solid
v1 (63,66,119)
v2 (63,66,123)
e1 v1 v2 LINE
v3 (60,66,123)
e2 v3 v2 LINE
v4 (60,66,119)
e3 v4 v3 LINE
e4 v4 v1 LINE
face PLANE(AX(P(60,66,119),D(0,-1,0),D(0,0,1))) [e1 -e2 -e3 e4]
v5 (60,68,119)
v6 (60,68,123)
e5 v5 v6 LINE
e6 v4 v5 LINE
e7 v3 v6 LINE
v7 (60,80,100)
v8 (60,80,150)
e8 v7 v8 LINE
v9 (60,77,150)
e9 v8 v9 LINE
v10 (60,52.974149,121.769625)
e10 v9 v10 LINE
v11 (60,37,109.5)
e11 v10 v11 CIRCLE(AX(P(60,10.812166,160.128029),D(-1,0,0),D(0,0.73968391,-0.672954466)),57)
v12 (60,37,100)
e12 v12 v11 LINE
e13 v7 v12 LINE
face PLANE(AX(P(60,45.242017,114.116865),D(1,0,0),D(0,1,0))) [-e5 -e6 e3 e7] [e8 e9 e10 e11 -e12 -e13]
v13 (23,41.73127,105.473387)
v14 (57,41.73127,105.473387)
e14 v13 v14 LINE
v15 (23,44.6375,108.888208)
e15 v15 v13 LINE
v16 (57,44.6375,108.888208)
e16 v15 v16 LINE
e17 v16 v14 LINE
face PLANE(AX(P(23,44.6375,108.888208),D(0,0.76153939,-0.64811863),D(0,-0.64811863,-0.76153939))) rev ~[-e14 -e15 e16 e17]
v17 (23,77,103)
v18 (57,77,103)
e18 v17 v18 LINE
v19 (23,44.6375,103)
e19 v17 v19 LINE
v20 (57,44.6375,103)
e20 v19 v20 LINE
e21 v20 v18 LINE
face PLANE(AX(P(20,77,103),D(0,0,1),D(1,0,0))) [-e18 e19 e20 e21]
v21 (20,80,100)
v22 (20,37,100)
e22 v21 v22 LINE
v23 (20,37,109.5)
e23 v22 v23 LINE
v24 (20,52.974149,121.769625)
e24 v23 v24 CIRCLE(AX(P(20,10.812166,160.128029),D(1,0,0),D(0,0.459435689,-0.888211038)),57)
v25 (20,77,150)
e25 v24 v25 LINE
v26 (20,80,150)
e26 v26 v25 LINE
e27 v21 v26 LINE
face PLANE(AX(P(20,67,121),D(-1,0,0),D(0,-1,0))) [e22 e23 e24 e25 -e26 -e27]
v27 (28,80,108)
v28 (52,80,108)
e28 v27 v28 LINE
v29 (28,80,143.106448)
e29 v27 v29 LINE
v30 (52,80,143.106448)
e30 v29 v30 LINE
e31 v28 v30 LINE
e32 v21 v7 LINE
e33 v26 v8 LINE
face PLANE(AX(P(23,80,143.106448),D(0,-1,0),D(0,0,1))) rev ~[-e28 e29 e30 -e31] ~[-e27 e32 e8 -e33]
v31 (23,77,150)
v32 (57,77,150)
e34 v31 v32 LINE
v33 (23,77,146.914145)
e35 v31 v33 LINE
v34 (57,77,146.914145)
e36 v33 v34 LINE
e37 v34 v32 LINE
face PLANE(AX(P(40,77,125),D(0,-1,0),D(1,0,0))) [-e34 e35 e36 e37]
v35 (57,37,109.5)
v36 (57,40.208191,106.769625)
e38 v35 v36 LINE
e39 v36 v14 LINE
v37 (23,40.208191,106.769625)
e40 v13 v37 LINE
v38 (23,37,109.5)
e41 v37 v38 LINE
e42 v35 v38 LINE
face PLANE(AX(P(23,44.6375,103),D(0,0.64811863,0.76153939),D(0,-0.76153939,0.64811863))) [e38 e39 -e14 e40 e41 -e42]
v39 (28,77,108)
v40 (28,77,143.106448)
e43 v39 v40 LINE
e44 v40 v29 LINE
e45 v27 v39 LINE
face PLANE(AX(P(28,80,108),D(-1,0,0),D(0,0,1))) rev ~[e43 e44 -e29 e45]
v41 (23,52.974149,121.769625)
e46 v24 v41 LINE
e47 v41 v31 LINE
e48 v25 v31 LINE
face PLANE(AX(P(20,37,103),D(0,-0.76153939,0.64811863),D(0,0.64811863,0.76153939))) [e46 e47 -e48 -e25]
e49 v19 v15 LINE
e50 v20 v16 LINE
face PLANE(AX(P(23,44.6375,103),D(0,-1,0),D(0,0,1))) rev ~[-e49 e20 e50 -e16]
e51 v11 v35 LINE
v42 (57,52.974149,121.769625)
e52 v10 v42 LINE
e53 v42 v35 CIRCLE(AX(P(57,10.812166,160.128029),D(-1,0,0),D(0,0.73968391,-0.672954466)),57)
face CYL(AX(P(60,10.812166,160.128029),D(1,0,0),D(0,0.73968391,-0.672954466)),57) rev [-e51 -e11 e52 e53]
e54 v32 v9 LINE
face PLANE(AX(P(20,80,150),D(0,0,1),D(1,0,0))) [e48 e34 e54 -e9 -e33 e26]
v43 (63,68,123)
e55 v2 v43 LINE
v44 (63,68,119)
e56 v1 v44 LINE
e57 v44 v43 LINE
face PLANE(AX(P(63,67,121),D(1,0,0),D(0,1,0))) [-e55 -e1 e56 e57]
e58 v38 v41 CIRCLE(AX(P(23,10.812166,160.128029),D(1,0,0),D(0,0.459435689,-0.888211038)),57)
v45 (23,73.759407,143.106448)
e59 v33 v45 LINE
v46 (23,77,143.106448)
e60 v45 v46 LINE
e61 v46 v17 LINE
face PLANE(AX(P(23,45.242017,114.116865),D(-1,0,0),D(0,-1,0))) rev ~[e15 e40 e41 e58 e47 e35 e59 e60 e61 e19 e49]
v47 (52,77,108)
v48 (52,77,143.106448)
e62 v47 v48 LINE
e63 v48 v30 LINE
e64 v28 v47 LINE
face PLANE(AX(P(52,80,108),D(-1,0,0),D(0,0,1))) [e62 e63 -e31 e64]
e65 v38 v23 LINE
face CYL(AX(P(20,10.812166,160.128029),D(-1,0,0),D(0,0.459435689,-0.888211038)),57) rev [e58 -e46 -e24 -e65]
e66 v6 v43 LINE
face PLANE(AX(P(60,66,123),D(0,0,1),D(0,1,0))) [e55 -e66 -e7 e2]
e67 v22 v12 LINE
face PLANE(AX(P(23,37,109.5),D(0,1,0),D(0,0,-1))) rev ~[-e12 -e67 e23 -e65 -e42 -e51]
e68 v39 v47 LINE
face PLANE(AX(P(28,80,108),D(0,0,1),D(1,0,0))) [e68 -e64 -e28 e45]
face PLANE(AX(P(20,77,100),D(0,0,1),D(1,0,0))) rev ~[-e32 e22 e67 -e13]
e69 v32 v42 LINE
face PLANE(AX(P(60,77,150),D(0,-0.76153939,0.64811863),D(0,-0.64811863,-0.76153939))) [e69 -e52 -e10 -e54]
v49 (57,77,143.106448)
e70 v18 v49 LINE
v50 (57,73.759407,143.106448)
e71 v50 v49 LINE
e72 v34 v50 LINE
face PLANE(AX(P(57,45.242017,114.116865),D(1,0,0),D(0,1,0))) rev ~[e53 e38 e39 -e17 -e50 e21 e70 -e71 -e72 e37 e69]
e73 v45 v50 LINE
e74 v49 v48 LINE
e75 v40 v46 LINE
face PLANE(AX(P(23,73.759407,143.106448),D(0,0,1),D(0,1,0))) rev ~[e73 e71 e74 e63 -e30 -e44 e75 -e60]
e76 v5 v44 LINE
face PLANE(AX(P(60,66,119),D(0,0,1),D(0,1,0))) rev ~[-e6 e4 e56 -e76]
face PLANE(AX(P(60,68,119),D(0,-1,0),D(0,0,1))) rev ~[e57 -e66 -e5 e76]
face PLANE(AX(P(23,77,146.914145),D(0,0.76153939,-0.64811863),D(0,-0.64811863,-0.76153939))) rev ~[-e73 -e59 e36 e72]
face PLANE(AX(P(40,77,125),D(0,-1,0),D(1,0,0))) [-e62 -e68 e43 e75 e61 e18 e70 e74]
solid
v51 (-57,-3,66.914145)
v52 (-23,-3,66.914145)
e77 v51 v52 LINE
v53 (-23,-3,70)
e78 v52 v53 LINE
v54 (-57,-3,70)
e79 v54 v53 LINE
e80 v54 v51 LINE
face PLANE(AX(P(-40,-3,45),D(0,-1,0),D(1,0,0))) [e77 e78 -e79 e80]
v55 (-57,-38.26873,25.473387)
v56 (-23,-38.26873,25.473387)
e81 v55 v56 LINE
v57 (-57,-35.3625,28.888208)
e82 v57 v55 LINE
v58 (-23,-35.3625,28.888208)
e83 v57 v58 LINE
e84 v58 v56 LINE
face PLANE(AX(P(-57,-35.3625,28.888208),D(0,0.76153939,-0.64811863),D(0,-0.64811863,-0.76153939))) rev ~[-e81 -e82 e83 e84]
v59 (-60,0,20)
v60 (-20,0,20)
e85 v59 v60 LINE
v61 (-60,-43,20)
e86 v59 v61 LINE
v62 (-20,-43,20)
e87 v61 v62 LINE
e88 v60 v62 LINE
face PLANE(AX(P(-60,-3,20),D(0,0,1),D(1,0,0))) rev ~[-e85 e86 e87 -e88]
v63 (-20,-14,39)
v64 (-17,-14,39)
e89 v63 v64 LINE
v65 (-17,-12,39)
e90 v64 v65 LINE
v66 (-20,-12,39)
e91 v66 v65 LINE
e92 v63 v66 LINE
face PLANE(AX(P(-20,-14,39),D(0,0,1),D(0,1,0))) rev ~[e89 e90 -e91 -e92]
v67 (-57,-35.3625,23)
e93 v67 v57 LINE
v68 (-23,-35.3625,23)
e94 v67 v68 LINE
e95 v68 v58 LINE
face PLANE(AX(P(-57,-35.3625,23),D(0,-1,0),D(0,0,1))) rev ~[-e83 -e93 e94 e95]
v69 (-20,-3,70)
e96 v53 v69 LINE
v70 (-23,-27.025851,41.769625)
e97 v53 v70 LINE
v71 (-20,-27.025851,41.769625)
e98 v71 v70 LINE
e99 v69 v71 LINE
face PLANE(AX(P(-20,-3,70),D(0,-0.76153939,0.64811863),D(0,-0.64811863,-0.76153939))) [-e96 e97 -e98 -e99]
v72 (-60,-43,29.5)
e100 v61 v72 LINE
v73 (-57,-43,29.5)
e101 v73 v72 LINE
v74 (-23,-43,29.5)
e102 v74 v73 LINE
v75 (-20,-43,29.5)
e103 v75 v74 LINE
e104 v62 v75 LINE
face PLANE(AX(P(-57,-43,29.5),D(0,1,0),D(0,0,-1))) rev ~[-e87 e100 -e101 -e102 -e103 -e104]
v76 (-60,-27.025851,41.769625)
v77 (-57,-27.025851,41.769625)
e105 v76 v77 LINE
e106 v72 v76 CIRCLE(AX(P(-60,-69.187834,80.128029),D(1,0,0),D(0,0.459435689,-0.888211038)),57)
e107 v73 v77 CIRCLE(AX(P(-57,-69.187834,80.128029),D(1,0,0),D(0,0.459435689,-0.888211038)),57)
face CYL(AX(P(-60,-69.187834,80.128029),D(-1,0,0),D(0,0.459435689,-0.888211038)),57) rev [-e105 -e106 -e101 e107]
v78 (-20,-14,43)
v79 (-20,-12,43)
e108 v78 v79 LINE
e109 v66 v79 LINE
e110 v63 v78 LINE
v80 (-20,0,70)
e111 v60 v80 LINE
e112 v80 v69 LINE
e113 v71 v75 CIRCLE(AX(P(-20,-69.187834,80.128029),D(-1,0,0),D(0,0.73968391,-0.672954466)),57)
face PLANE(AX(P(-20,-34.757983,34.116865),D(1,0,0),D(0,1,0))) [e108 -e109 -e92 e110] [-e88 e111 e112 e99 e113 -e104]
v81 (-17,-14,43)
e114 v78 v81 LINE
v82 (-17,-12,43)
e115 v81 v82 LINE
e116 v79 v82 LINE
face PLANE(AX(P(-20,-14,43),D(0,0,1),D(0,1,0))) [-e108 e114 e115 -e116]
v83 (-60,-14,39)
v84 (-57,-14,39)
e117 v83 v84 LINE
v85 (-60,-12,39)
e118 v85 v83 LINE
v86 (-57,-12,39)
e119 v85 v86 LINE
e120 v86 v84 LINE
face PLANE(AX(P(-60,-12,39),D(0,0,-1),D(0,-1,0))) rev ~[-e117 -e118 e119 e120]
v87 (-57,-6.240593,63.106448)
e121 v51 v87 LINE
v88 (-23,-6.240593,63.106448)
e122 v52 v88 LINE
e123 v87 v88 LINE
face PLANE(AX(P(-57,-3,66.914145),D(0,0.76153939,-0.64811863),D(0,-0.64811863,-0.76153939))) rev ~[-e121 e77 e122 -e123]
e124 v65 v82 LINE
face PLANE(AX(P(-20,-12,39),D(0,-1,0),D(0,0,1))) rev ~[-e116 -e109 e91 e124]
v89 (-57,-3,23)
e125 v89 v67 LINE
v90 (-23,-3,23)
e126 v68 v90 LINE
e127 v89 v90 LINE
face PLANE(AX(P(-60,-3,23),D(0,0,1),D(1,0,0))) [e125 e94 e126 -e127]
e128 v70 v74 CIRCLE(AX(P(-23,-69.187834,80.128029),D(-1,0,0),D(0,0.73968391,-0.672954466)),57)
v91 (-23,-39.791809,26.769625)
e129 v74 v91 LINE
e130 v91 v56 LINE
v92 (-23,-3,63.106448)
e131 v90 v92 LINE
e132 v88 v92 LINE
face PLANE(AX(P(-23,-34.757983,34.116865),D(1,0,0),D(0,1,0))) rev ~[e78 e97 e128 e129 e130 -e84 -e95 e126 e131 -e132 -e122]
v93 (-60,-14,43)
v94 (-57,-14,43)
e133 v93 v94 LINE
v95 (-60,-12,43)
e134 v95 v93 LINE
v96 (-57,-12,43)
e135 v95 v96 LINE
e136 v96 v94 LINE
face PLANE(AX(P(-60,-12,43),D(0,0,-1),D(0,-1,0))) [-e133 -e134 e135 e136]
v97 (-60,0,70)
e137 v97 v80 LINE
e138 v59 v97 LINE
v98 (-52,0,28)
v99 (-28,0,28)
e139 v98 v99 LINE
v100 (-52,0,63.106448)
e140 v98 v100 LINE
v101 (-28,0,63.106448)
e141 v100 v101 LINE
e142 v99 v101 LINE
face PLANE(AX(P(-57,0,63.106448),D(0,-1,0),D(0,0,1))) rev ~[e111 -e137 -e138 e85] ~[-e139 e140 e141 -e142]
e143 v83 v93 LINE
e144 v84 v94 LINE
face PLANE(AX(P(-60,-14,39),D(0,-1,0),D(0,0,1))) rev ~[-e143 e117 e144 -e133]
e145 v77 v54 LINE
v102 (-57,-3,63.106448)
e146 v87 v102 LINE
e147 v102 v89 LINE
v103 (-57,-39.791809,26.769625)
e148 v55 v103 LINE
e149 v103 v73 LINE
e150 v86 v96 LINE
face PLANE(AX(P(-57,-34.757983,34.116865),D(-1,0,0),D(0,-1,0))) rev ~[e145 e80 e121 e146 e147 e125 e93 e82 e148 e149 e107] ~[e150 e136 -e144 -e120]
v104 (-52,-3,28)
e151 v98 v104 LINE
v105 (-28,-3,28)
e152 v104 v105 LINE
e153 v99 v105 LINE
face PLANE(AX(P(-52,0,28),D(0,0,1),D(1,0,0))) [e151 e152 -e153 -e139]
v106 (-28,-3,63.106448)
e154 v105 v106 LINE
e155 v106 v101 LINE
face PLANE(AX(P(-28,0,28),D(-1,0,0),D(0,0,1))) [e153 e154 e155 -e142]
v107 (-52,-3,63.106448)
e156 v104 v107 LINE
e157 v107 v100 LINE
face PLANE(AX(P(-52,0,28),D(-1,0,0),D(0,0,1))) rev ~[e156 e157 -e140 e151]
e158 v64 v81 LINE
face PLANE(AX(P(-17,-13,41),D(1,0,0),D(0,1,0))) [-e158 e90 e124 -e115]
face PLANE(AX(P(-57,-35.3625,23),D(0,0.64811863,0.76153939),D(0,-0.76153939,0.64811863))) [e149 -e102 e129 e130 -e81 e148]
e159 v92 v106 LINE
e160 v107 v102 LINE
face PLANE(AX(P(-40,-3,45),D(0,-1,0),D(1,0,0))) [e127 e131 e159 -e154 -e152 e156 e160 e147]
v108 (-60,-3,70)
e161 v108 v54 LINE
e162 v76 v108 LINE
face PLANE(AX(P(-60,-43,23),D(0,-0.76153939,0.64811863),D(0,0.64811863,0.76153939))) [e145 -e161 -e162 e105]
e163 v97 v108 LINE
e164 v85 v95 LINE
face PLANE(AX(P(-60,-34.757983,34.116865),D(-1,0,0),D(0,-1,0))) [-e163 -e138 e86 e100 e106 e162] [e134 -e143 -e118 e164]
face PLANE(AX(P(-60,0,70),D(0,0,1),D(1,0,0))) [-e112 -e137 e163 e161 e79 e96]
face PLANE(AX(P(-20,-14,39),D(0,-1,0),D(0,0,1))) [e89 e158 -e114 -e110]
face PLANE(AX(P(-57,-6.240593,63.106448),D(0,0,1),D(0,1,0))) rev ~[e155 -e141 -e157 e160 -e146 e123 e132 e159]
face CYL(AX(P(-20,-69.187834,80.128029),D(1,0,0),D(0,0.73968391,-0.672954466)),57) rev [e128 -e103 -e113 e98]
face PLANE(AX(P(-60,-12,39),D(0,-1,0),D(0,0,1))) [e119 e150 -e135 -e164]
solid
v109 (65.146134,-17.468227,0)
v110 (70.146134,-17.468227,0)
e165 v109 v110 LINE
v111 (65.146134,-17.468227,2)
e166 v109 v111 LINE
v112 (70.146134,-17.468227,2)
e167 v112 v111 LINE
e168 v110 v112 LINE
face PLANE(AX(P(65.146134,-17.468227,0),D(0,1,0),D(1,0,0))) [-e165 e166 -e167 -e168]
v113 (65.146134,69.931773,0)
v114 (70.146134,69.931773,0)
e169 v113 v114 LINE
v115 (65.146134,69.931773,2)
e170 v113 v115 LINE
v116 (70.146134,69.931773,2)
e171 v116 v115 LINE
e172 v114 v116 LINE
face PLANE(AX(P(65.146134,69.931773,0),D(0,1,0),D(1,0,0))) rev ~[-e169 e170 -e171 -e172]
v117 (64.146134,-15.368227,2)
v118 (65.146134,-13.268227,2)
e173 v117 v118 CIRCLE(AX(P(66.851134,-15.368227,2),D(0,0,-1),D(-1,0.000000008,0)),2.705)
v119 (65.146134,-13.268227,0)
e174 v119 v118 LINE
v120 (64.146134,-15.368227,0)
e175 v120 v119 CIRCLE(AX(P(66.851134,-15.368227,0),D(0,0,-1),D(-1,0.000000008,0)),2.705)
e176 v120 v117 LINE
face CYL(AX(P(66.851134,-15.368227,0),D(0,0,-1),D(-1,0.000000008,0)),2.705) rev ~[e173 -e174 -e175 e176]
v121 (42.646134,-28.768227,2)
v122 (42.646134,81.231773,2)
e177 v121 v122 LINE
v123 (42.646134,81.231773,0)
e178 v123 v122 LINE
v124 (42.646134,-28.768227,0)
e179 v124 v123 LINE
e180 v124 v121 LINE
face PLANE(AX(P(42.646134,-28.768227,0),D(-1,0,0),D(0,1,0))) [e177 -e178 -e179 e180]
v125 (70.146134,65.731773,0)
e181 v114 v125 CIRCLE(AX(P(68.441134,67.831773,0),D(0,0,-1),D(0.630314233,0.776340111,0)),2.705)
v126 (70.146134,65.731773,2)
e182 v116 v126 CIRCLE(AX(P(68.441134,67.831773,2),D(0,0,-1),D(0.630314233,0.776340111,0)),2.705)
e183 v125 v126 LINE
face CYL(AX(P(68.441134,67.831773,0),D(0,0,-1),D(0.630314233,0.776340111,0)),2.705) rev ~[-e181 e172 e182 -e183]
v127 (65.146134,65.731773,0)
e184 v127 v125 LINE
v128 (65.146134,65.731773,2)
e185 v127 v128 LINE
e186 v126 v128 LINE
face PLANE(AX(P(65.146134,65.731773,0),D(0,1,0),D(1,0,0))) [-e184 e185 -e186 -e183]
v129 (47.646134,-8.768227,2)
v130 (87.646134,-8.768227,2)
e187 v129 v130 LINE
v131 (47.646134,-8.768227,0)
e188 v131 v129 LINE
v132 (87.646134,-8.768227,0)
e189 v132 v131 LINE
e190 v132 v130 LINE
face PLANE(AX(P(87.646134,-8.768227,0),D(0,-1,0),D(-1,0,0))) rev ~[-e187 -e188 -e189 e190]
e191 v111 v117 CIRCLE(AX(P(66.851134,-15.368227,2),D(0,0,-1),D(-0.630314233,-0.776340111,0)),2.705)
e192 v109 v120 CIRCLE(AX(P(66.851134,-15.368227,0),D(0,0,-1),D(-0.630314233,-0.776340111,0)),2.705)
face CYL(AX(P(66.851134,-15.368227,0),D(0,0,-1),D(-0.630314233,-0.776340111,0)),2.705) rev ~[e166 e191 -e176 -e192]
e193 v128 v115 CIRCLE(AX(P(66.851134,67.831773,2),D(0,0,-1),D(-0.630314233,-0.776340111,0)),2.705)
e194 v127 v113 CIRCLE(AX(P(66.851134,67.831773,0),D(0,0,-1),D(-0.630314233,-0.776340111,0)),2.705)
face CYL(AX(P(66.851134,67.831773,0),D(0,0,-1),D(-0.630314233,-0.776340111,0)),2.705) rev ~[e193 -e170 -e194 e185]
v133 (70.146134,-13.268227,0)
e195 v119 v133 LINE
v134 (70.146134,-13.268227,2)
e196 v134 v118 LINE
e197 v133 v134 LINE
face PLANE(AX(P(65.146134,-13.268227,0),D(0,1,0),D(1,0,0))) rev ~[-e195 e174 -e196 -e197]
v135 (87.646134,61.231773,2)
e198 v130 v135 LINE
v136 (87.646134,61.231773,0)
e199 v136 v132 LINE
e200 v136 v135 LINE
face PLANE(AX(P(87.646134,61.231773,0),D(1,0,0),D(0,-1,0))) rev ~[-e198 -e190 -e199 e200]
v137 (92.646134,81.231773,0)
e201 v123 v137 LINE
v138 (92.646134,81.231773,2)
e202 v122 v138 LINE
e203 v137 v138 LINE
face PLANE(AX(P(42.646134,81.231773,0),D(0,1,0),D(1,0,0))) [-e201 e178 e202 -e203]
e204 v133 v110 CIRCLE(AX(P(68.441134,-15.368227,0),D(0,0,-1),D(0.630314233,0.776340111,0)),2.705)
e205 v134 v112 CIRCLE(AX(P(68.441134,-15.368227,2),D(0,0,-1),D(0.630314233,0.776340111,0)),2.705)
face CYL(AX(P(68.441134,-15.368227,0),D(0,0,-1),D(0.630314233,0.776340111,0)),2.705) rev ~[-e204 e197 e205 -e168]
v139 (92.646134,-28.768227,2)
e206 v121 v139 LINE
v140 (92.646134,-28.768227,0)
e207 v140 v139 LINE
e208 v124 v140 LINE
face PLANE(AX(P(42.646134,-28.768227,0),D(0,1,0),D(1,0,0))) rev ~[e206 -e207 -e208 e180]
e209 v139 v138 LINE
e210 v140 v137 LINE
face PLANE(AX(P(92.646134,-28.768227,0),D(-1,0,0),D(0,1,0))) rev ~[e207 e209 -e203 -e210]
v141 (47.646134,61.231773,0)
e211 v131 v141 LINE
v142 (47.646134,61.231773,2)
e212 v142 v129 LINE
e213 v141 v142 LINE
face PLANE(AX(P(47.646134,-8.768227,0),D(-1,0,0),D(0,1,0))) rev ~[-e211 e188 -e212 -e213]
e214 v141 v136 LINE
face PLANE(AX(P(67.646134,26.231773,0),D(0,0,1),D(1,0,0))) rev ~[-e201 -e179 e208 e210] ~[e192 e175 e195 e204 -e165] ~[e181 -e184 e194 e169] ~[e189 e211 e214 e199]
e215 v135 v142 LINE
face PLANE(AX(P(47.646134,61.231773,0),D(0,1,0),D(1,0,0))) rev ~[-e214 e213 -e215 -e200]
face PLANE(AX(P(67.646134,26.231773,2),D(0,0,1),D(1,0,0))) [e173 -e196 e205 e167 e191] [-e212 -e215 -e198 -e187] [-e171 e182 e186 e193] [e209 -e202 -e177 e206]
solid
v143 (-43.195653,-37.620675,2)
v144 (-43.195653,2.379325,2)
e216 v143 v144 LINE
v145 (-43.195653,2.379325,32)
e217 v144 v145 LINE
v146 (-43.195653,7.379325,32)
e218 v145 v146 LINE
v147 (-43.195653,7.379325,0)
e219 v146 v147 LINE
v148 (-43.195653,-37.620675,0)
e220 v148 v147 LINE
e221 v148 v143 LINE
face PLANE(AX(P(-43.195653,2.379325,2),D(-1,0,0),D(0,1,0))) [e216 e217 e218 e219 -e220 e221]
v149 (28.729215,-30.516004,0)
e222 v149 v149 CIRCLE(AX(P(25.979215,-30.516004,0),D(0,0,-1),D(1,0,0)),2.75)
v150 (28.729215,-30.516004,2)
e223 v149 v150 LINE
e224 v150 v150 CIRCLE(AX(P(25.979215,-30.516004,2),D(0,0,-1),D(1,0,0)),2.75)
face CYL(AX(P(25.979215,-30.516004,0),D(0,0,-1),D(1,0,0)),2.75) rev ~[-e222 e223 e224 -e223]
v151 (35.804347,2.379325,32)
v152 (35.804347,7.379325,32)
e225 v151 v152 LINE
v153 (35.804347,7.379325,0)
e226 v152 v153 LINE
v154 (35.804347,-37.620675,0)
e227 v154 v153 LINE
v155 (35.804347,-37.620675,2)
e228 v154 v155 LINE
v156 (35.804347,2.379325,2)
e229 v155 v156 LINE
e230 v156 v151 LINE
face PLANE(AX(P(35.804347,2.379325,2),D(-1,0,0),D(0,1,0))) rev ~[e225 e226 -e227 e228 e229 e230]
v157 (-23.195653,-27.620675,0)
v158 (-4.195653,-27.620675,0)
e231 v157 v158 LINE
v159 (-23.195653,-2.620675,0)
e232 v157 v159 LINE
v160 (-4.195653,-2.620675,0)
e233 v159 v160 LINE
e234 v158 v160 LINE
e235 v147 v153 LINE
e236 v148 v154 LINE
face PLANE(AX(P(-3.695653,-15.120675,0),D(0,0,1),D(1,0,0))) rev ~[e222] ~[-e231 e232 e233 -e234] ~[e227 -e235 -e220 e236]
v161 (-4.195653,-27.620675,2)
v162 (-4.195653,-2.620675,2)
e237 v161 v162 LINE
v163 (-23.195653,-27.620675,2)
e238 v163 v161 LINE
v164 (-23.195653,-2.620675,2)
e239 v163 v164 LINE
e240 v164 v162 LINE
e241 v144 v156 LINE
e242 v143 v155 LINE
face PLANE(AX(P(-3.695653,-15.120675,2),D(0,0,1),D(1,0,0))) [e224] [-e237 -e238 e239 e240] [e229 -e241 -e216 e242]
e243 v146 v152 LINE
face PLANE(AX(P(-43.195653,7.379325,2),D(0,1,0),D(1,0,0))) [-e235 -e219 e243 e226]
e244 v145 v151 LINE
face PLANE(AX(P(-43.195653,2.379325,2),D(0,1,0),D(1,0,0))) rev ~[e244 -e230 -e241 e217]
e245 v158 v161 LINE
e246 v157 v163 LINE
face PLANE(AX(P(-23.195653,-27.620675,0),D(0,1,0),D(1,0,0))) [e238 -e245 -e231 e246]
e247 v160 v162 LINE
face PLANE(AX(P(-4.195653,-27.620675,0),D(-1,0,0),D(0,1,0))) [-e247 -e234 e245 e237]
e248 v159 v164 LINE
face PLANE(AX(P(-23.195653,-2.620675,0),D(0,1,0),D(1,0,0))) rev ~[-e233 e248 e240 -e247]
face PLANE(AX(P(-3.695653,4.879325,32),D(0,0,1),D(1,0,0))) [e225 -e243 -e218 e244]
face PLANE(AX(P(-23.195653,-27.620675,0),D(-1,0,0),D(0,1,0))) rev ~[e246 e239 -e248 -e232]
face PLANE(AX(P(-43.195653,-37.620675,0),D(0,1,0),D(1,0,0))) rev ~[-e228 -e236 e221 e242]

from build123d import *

# Parameters (mm, degrees)
F0_W           = 40
F0_H           = 50
F0_W_2         = 24
F0_H_2         = 38
F1_DEPTH       = 3
F2_W           = 40
F2_H           = 3
F3_DEPTH       = 40
F5_DEPTH       = 3
F7_DEPTH       = 3
F8_W           = 3
F8_H           = 2.8935517733
F9_DEPTH       = 34
F11_DEPTH      = 37
F11_DEPTH_BACK = 3
F13_DEPTH      = 34
F14_W          = 2
F14_H          = 4
F15_DEPTH      = 3
F16_W          = 2
F16_H          = 4
F17_DEPTH      = 25
F19_DEPTH      = 3
F21_DEPTH      = 3
F23_W          = 2
F23_H          = 4
F24_DEPTH      = 3
F25_W          = 50
F25_H          = 110
F26_DEPTH      = 2
F28_DEPTH      = 25
F29_W          = 5
F29_H          = 4.2
F30_DEPTH      = 25
F32_W          = 79
F32_H          = 45
F32_W_2        = 19
F32_H_2        = 25
F33_DEPTH      = 2
F34_W          = 79
F34_H          = 5
F35_DEPTH      = 30
F36_R          = 2.75
F37_DEPTH      = 25


with BuildPart() as f1:
    # F0 (on Front) → F1 (new body)
    with BuildSketch(Plane.XZ):
        with Locations((-40, 45)):
            Rectangle(F0_W, F0_H)
        with Locations((-40, 47)):
            Rectangle(F0_W_2, F0_H_2, mode=Mode.SUBTRACT)
    extrude(amount=F1_DEPTH)

    # F2 (on face) → F3 (join)
    with BuildSketch(Plane.XZ.offset(3)):
        with Locations((-40, 21.5)):
            Rectangle(F2_W, F2_H)
    extrude(amount=F3_DEPTH)

    # F4 (on face) → F5 (join)
    with BuildSketch(Plane(origin=(-60, 0, 0), x_dir=(0, -1, 0), z_dir=(-1, 0, 0))):
        Polygon((43, 23), (3, 70), (3, 23), align=None)
    extrude(amount=-F5_DEPTH)

    # F6 (on face) → F7 (join)
    with BuildSketch(Plane.YZ.offset(-20)):
        Polygon((-3, 70), (-43, 23), (-3, 23), align=None)
    extrude(amount=-F7_DEPTH)

    # F8 (on face) → F9 (join, through all)
    with BuildSketch(Plane.YZ.offset(-57)):
        Polygon((-3, 66), (-3, 66.9141451752), (-6.2405931476, 63.1064482267), (-3, 63.1064482267), align=None)
        with Locations((-1.5, 64.5532241133)):
            Rectangle(F8_W, F8_H)
    extrude(amount=F9_DEPTH)

    # F10 (on face) → F11 (join, two sides)
    with BuildSketch(Plane.YZ.offset(-57)) as f11_sk:
        Polygon((-43, 23), (-35.3625, 23), (-43, 29.5), align=None)
    extrude(amount=F11_DEPTH)
    extrude(f11_sk.sketch, amount=-F11_DEPTH_BACK)

    # F12 (on face) → F13 (join, through all)
    with BuildSketch(Plane.YZ.offset(-57)):
        Polygon((-35.3625, 28.8882076752), (-38.2687300943, 25.4733873143), (-35.3625, 23), align=None)
    extrude(amount=F13_DEPTH)

    # F14 (on face) → F15 (join)
    with BuildSketch(Plane.YZ.offset(-20)):
        with Locations((-13, 41)):
            Rectangle(F14_W, F14_H)
    extrude(amount=F15_DEPTH)

    # F16 (on face) → F17 (cut)
    with BuildSketch(Plane(origin=(-60, 0, 0), x_dir=(0, -1, 0), z_dir=(-1, 0, 0))):
        with Locations((13, 41)):
            Rectangle(F16_W, F16_H)
    extrude(amount=-F17_DEPTH, mode=Mode.SUBTRACT)

    # F18 (on face) → F19 (join, through all)
    with BuildSketch(Plane(origin=(-60, 0, 0), x_dir=(0, -1, 0), z_dir=(-1, 0, 0))):
        with BuildLine():
            ThreePointArc((43, 29.5), (34.4666549031, 34.9236078783), (27.0258514269, 41.7696245734))
            Line((27.0258514269, 41.7696245734), (39.7918088737, 26.7696245734))
            Line((39.7918088737, 26.7696245734), (43, 29.5))
        make_face()
    extrude(amount=-F19_DEPTH)

    # F20 (on face) → F21 (join, through all)
    with BuildSketch(Plane.YZ.offset(-20)):
        with BuildLine():
            ThreePointArc((-27.0258514269, 41.7696245734), (-34.4666549031, 34.9236078783), (-43, 29.5))
            Line((-43, 29.5), (-39.7918088737, 26.7696245734))
            Line((-39.7918088737, 26.7696245734), (-27.0258514269, 41.7696245734))
        make_face()
    extrude(amount=-F21_DEPTH)


with BuildPart() as f22_1:
    # F22: copy of F1
    add(f1.part.moved(Location((80, 80, 80))))

    # F23 (on face) → F24 (join, through all)
    with BuildSketch(Plane(origin=(20, 0, 0), x_dir=(0, -1, 0), z_dir=(-1, 0, 0))):
        with Locations((-67, 121)):
            Rectangle(F23_W, F23_H)
    extrude(amount=-F24_DEPTH)


with BuildPart() as f26:
    # F25 (on Top) → F26 (new body)
    with BuildSketch(Plane.XY):
        with Locations((67.6461342699, 26.2317729229)):
            Rectangle(F25_W, F25_H)
    extrude(amount=F26_DEPTH)

    # F27 (on face) → F28 (cut)
    with BuildSketch(Plane(origin=(0, 0, 0), x_dir=(1, 0, 0), z_dir=(0, 0, -1))):
        Polygon((63.6029914021, -61.2317729229), (87.6461342699, -61.2317729229), (87.6461342699, -35.5290547013), (87.6461342699, 8.7682270771), (62.8203749657, 8.7682270771), (47.6461342699, 8.7682270771), (47.6461342699, -35.5290547013), (47.6461342699, -61.2317729229), align=None)
    extrude(amount=-F28_DEPTH, mode=Mode.SUBTRACT)

    # F29 (on face) → F30 (cut)
    with BuildSketch(Plane(origin=(0, 0, 0), x_dir=(1, 0, 0), z_dir=(0, 0, -1))):
        with BuildLine():
            ThreePointArc((71.1461342699, 15.3682270771), (70.8833719733, 16.5311974121), (70.1461342699, 17.4682270771))
            Line((70.1461342699, 17.4682270771), (70.1461342699, 13.2682270771))
            ThreePointArc((70.1461342699, 13.2682270771), (70.8833719733, 14.2052567421), (71.1461342699, 15.3682270771))
        make_face()
        with Locations((67.6461342699, 15.3682270771)):
            Rectangle(F29_W, F29_H)
        with BuildLine():
            Line((65.1461342699, 13.2682270771), (65.1461342699, 17.4682270771))
            ThreePointArc((65.1461342699, 17.4682270771), (64.4088965616, 16.5311974019), (64.1461342699, 15.3682270546))
            ThreePointArc((64.1461342699, 15.3682270546), (64.4088965713, 14.205256732), (65.1461342699, 13.2682270771))
        make_face()
        with Locations((67.6461342699, -67.8317729229)):
            Rectangle(F29_W, F29_H)
        with BuildLine():
            Line((70.1461342699, -65.7317729229), (70.1461342699, -69.9317729229))
            ThreePointArc((70.1461342699, -69.9317729229), (70.8833719733, -68.9947432579), (71.1461342699, -67.8317729229))
            ThreePointArc((71.1461342699, -67.8317729229), (70.8833719733, -66.6688025879), (70.1461342699, -65.7317729229))
        make_face()
        with BuildLine():
            ThreePointArc((64.1461342699, -67.8317729229), (64.4088965665, -68.9947432579), (65.1461342699, -69.9317729229))
            Line((65.1461342699, -69.9317729229), (65.1461342699, -65.7317729229))
            ThreePointArc((65.1461342699, -65.7317729229), (64.4088965665, -66.6688025879), (64.1461342699, -67.8317729229))
        make_face()
    extrude(amount=-F30_DEPTH, mode=Mode.SUBTRACT)


with BuildPart() as f33:
    # F32 (on face) → F33 (new body)
    with BuildSketch(Plane.XY):
        with Locations((-3.6956531787, -15.1206750181)):
            Rectangle(F32_W, F32_H)
        with Locations((-13.6956531787, -15.1206750181)):
            Rectangle(F32_W_2, F32_H_2, mode=Mode.SUBTRACT)
    extrude(amount=F33_DEPTH)

    # F34 (on face) → F35 (join)
    with BuildSketch(Plane.XY.offset(2)):
        with Locations((-3.6956531787, 4.8793249819)):
            Rectangle(F34_W, F34_H)
    extrude(amount=F35_DEPTH)

    # F36 (on face) → F37 (cut)
    with BuildSketch(Plane(origin=(0, 0, 0), x_dir=(1, 0, 0), z_dir=(0, 0, -1))):
        with Locations((25.9792152792, 30.5160041898)):
            Circle(F36_R)
    extrude(amount=-F37_DEPTH, mode=Mode.SUBTRACT)


solid = Compound([f1.part, f22_1.part, f26.part, f33.part])
